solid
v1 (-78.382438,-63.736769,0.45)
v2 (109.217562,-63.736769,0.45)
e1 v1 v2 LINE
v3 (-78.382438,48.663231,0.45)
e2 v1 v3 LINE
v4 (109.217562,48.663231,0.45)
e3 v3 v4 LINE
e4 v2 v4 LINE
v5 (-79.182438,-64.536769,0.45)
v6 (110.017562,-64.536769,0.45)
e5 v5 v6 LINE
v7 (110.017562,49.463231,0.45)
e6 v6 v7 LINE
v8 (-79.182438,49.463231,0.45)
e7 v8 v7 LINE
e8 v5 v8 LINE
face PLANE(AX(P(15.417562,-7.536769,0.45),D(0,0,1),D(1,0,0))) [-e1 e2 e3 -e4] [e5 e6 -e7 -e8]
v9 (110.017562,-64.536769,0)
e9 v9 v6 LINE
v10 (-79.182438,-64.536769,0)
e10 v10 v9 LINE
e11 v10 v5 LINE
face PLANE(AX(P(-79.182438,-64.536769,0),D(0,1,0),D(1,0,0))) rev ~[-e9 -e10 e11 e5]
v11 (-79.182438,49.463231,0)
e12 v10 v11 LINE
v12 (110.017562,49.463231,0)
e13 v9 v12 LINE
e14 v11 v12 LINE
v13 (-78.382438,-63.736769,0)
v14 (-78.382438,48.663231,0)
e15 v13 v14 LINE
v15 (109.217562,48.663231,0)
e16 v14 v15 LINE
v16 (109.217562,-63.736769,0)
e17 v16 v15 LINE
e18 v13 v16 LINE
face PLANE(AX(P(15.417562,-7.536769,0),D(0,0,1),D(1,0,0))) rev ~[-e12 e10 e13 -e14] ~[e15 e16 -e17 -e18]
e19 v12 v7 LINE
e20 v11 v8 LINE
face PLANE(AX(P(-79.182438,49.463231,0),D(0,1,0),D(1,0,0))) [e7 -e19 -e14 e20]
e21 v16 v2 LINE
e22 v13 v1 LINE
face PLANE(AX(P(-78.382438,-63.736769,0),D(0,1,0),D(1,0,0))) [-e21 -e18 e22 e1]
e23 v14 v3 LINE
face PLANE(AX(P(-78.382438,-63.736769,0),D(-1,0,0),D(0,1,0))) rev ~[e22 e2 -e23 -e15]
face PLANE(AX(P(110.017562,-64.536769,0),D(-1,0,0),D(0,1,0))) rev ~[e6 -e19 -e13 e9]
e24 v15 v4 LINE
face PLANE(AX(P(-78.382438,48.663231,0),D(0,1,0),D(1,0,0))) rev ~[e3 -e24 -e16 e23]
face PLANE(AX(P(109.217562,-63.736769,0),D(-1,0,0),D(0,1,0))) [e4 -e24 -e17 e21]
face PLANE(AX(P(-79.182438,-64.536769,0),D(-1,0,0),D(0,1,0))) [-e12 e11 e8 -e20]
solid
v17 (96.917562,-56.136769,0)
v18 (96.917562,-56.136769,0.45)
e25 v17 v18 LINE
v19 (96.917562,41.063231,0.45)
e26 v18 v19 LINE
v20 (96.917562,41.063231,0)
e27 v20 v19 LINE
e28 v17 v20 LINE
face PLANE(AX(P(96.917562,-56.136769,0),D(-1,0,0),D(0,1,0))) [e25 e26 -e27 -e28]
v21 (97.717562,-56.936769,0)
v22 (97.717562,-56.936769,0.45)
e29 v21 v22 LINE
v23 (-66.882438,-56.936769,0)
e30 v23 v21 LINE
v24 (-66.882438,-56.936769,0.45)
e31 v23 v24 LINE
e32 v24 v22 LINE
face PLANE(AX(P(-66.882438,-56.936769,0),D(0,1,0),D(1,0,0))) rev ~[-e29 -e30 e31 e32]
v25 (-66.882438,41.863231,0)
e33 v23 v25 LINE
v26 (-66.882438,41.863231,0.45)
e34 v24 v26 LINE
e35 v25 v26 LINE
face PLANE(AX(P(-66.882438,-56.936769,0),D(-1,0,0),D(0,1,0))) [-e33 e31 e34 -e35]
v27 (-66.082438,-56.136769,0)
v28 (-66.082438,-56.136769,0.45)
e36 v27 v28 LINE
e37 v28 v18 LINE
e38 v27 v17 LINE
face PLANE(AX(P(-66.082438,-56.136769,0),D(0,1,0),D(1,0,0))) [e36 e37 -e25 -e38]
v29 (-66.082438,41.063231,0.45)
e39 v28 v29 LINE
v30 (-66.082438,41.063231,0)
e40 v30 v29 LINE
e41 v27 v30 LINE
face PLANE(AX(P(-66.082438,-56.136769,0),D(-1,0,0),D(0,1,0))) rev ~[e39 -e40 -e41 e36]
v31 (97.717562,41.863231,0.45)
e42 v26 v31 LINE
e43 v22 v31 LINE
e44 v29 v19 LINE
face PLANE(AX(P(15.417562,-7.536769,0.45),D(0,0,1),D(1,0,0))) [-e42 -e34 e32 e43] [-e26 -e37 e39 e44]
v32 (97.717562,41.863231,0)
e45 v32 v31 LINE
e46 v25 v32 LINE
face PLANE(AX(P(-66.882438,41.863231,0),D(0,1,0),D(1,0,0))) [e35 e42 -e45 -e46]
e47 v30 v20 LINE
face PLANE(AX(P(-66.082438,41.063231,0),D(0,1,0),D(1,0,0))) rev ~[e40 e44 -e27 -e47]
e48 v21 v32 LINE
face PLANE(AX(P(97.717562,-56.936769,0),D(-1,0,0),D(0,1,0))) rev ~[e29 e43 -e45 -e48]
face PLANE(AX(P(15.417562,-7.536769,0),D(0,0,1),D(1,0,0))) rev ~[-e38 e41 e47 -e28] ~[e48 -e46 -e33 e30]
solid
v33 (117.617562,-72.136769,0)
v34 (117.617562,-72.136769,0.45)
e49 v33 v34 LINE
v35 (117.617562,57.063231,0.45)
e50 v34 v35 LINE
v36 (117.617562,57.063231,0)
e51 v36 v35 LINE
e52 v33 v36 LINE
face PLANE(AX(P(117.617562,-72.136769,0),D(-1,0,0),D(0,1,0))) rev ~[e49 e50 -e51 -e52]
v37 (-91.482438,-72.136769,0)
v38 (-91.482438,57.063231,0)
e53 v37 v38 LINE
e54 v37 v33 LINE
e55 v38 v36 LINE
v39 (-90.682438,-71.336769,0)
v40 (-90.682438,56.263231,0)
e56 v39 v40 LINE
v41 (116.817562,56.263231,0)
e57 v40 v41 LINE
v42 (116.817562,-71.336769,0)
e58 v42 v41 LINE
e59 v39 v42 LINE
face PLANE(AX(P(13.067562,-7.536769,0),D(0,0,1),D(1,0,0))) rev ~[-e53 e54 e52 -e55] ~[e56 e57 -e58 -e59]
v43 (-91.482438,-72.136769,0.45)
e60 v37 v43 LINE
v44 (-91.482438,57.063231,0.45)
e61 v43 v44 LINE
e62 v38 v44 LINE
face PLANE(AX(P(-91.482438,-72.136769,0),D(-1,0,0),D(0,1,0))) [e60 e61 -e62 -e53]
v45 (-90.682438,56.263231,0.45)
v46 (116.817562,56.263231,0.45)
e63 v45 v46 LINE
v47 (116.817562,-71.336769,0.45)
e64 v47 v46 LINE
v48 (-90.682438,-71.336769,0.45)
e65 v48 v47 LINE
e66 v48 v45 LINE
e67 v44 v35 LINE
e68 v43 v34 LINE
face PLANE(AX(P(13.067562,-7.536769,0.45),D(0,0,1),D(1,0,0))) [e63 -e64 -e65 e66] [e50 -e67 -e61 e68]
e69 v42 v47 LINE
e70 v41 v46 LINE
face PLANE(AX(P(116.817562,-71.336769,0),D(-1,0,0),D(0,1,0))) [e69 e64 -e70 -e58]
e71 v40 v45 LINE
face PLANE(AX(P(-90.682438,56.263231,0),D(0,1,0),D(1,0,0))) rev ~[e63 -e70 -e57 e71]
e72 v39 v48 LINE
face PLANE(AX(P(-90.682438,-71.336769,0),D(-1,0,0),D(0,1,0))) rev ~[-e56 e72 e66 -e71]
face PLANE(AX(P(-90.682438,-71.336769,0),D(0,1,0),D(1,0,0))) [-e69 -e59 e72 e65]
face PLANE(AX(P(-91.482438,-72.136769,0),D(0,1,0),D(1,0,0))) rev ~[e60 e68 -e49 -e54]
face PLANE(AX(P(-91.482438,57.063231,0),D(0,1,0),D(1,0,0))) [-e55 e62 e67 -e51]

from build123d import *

# Parameters (mm, degrees)
F1_W     = 189.2
F1_H     = 114
F1_W_2   = 187.6
F1_H_2   = 112.4
F2_DEPTH = 0.45
F1_W_3   = 209.1
F1_H_3   = 129.2
F1_W_4   = 207.5
F1_H_4   = 127.6
F1_W_5   = 164.6
F1_H_5   = 98.8
F1_W_6   = 163
F1_H_6   = 97.2


# Not quite as in the source:
# - a feature names something its author has since deleted; it is built from what else it names


with BuildPart() as f2:
    # F1 (on Top) → F2 (new body)
    with BuildSketch(Plane.XY):
        with Locations((15.4175617039, -7.5367691362)):
            Rectangle(F1_W, F1_H)
        with Locations((15.4175617039, -7.5367691362)):
            Rectangle(F1_W_2, F1_H_2, mode=Mode.SUBTRACT)
    extrude(amount=F2_DEPTH)


with BuildPart() as f2b:
    # F1 (on Top) → F2, piece 2 (new body)
    with BuildSketch(Plane.XY):
        with Locations((13.0675617039, -7.5367691362)):
            Rectangle(F1_W_3, F1_H_3)
        with Locations((13.0675617039, -7.5367691362)):
            Rectangle(F1_W_4, F1_H_4, mode=Mode.SUBTRACT)
    extrude(amount=F2_DEPTH)


with BuildPart() as f2c:
    # F1 (on Top) → F2, piece 3 (new body)
    with BuildSketch(Plane.XY):
        with Locations((15.4175617039, -7.5367691362)):
            Rectangle(F1_W_5, F1_H_5)
        with Locations((15.4175617039, -7.5367691362)):
            Rectangle(F1_W_6, F1_H_6, mode=Mode.SUBTRACT)
    extrude(amount=F2_DEPTH)


solid = Compound([f2.part, f2b.part, f2c.part])
